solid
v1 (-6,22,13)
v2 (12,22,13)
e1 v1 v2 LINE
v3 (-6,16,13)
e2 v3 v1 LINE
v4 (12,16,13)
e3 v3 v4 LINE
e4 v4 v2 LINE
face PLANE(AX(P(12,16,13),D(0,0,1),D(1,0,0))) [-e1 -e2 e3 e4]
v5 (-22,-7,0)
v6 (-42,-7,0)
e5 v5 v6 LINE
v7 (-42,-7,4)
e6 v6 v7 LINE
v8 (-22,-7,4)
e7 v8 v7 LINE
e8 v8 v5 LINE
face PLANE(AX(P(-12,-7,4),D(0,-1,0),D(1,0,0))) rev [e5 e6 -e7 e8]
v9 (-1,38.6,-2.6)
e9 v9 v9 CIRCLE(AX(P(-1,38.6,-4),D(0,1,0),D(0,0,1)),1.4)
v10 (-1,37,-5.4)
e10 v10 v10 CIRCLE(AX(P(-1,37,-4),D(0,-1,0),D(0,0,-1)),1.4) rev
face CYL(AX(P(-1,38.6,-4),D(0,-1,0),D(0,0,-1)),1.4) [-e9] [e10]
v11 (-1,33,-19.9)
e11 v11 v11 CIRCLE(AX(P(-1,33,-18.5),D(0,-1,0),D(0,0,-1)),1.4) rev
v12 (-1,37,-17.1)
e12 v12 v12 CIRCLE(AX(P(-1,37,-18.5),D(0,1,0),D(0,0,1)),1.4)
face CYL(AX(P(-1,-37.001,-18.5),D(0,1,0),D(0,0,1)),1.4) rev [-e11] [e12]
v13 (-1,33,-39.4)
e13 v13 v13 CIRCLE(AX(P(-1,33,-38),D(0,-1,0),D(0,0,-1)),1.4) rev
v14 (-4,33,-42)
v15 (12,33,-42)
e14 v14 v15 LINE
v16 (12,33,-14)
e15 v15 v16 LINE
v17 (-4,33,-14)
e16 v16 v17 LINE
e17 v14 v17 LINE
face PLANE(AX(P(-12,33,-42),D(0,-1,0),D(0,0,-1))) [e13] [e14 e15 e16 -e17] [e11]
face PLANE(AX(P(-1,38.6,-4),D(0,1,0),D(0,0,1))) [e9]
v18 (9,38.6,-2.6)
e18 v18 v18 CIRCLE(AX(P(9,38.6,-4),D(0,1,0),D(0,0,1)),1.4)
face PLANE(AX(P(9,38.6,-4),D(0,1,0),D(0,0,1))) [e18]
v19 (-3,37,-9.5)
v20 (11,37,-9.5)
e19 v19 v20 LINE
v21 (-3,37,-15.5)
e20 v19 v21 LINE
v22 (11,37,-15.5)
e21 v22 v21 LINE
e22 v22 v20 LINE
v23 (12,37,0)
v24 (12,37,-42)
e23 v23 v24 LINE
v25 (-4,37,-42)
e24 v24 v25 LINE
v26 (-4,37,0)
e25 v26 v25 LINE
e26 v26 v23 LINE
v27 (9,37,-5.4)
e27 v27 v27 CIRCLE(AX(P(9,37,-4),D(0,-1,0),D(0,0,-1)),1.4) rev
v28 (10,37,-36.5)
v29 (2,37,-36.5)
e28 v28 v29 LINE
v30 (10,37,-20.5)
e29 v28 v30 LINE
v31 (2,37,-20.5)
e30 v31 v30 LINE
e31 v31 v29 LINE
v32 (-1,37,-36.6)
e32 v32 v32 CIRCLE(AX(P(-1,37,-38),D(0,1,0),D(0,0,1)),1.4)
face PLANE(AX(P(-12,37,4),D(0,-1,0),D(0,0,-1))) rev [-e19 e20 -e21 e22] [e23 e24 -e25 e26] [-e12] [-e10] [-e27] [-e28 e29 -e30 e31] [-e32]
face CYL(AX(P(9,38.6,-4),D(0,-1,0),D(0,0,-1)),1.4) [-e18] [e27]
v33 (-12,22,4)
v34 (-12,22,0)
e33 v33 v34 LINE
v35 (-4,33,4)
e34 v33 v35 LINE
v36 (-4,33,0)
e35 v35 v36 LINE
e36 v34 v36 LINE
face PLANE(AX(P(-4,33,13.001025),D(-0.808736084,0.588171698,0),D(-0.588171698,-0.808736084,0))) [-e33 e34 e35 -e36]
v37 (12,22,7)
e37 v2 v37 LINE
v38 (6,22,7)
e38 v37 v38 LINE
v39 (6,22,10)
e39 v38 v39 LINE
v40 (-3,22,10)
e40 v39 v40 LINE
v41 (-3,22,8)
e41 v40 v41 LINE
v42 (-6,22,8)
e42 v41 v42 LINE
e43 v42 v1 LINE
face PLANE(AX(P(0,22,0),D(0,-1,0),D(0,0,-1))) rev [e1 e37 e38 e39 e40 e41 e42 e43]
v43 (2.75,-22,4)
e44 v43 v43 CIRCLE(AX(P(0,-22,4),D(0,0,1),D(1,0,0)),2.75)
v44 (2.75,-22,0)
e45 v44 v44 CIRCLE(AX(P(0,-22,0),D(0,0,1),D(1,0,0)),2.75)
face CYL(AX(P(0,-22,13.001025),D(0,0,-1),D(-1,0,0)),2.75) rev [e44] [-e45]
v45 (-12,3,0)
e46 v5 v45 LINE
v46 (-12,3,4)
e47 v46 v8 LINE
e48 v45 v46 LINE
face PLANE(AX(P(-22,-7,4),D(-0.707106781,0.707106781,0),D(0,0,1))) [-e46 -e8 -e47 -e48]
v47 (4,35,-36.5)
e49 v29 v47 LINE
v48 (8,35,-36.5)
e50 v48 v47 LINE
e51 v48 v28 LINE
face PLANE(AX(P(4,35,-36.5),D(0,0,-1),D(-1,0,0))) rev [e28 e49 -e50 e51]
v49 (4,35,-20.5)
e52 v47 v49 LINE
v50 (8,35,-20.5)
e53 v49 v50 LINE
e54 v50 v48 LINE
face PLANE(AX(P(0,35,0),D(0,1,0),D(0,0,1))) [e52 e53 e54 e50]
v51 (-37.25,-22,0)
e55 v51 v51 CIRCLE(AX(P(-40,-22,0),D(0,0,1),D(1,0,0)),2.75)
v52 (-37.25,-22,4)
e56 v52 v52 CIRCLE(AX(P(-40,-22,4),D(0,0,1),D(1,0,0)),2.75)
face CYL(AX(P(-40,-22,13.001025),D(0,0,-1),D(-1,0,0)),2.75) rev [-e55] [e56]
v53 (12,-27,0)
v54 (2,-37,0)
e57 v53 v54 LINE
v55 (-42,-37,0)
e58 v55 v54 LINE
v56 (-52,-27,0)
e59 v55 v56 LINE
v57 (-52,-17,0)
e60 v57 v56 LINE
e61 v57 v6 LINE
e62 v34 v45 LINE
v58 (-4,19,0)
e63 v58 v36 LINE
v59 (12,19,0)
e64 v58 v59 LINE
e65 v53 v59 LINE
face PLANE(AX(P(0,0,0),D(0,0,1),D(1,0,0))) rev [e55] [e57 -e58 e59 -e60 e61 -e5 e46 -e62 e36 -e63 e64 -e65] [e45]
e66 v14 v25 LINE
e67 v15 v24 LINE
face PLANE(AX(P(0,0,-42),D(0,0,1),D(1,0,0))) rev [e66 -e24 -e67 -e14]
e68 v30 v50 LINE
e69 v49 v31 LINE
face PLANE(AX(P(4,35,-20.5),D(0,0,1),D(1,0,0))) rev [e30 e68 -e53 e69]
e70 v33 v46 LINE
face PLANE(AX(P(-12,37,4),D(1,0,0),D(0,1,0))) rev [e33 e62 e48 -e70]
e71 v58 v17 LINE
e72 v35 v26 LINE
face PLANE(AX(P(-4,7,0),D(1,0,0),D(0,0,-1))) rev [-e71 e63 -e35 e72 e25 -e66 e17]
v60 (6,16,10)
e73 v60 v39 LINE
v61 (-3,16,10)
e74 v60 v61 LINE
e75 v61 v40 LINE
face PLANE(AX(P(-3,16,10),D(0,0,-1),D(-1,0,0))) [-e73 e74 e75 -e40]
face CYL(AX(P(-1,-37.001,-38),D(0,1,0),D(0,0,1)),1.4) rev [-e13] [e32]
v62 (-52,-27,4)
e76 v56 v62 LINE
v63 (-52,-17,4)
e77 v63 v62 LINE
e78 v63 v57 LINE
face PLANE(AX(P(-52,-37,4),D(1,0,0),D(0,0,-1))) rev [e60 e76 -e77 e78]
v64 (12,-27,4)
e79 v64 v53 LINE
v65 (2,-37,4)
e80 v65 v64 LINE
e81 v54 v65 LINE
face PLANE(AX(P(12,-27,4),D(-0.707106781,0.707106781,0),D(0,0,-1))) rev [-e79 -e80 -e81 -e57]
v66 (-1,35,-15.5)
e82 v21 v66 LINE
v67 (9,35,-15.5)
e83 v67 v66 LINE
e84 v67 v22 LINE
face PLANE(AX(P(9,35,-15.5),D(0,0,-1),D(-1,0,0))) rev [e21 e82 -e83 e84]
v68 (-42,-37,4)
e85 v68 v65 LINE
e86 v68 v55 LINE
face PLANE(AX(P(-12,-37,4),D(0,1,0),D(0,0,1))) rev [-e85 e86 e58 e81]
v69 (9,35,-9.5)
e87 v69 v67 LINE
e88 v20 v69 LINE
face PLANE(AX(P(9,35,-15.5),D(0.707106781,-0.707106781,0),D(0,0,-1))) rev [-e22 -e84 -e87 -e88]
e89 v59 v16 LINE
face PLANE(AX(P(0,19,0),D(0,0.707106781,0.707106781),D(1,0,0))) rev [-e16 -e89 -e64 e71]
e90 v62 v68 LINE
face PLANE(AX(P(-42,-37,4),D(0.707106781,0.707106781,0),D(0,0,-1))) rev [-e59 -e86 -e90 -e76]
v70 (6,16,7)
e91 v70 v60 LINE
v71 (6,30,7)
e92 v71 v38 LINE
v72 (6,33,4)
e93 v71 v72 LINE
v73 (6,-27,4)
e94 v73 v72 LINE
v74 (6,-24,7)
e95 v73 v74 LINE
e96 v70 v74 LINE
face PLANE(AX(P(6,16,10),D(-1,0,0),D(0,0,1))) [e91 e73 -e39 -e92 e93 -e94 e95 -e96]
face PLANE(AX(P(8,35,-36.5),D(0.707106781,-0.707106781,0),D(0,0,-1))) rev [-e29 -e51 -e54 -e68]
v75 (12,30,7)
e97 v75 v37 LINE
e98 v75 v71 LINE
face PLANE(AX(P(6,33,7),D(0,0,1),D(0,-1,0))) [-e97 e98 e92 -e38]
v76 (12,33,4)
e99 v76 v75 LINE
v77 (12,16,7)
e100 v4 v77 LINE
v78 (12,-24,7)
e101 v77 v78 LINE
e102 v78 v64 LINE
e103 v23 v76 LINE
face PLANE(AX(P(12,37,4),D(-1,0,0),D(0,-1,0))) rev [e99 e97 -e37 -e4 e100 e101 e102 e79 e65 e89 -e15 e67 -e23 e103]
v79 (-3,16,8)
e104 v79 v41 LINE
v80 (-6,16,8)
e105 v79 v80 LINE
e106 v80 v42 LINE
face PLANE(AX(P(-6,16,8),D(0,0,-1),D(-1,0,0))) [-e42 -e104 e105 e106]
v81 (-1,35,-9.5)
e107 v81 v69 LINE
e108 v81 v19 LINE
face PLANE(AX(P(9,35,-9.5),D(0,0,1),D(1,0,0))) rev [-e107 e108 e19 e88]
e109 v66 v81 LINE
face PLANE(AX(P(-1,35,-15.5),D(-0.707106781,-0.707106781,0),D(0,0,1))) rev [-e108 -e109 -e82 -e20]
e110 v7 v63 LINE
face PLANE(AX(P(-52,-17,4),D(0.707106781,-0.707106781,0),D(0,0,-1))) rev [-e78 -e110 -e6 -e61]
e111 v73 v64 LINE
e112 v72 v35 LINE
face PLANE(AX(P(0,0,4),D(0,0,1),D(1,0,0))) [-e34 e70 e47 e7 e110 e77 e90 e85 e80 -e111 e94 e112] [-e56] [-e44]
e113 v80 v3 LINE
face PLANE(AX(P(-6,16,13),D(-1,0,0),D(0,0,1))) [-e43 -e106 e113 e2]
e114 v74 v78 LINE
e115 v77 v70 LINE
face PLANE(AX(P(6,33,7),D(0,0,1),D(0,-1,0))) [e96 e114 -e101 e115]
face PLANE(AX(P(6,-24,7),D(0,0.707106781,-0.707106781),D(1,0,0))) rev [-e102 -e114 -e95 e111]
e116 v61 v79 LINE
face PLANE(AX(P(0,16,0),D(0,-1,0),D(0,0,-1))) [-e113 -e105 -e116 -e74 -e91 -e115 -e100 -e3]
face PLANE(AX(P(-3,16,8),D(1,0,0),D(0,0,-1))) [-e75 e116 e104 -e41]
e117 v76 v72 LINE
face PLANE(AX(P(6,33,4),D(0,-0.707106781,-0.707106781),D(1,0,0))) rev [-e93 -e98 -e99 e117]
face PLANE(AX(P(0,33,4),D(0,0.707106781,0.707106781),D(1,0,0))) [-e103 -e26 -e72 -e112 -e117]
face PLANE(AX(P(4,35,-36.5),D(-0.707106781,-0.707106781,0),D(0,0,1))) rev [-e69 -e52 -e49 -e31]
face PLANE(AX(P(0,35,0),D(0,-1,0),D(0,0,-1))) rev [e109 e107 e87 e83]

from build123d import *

# Parameters (mm, degrees)
SKETCH1_W           = 24
SKETCH1_H           = 74
BOSS_EXTRUDE1_DEPTH = 4
SKETCH3_W           = 24
SKETCH3_H           = 4
BOSS_EXTRUDE2_DEPTH = 42
CHAMFER1_SIZE       = 14
CHAMFER2_SIZE       = 4
SKETCH4_W           = 8
SKETCH4_H           = 42
CUT_EXTRUDE3_DEPTH  = 30
SKETCH5_R           = 1.4
BOSS_EXTRUDE3_DEPTH = 1.6
CUT_EXTRUDE4_REACH  = 87.93
SKETCH6_R           = 1.4
BOSS_EXTRUDE4_DEPTH = 6
CUT_EXTRUDE6_REACH  = 60.292
SKETCH11_W          = 40
SKETCH11_H          = 30
BOSS_EXTRUDE6_DEPTH = 4
CUT_EXTRUDE2_REACH  = 79.188
SKETCH2_R           = 2.75
CHAMFER3_SIZE       = 10
SKETCH12_W          = 3
SKETCH12_H          = 60
BOSS_EXTRUDE7_DEPTH = 6
CHAMFER4_SIZE       = 3
SKETCH13_W          = 4
SKETCH13_H          = 16
SKETCH13_W_2        = 10
SKETCH13_H_2        = 6
CUT_EXTRUDE7_DEPTH  = 2
CHAMFER5_SIZE       = 2


with BuildPart() as part:
    # Sketch1 → Boss-Extrude1 (new body)
    with BuildSketch(Plane.XY):
        Rectangle(SKETCH1_W, SKETCH1_H)
    extrude(amount=BOSS_EXTRUDE1_DEPTH)

    # Sketch3 → Boss-Extrude2 (add)
    with BuildSketch(Plane.XY):
        with Locations((0, 35)):
            Rectangle(SKETCH3_W, SKETCH3_H)
    extrude(amount=-BOSS_EXTRUDE2_DEPTH)

    # Chamfer1
    chamfer1_edges = [part.edges().sort_by_distance(p)[0] for p in [
        (0, 33, 0),
    ]]
    chamfer(chamfer1_edges, length=CHAMFER1_SIZE)

    # Chamfer2
    chamfer2_edges = [part.edges().sort_by_distance(p)[0] for p in [
        (0, 37, 4),
    ]]
    chamfer(chamfer2_edges, length=CHAMFER2_SIZE)

    # Sketch4 → Cut-Extrude3 (cut)
    with BuildSketch(Plane(origin=(0, 37, 0), x_dir=(1, 0, 0), z_dir=(0, 1, 0))):
        with Locations((-8, 21)):
            Rectangle(SKETCH4_W, SKETCH4_H)
    extrude(amount=-CUT_EXTRUDE3_DEPTH, mode=Mode.SUBTRACT)

    # Sketch5 → Boss-Extrude3 (add)
    with BuildSketch(Plane(origin=(0, 37, 0), x_dir=(1, 0, 0), z_dir=(0, 1, 0))):
        with Locations(Location((-1, 4, 0), (0, 0, 90))):
            Circle(SKETCH5_R)
        with Locations(Location((9, 4, 0), (0, 0, 90))):
            Circle(SKETCH5_R)
    extrude(amount=BOSS_EXTRUDE3_DEPTH)

    # Sketch6 → Cut-Extrude4 (cut, up to next)
    with BuildSketch(Plane(origin=(0, 37, 0), x_dir=(1, 0, 0), z_dir=(0, 1, 0)), mode=Mode.PRIVATE) as cut_extrude4_sk1:
        with Locations(Location((-1, 18.5, 0), (0, 0, 270))):
            Circle(SKETCH6_R)
    cut_extrude4_tool1 = extrude(cut_extrude4_sk1.sketch, amount=-CUT_EXTRUDE4_REACH, mode=Mode.PRIVATE) & part.part
    # Sketch6 → Cut-Extrude4 (cut, up to next)
    with BuildSketch(Plane(origin=(0, 37, 0), x_dir=(1, 0, 0), z_dir=(0, 1, 0)), mode=Mode.PRIVATE) as cut_extrude4_sk2:
        with Locations(Location((-1, 38, 0), (0, 0, 270))):
            Circle(SKETCH6_R)
    cut_extrude4_tool2 = extrude(cut_extrude4_sk2.sketch, amount=-CUT_EXTRUDE4_REACH, mode=Mode.PRIVATE) & part.part
    add(cut_extrude4_tool1.solids().sort_by_distance((-1, 37, -18.5))[0], mode=Mode.SUBTRACT)
    add(cut_extrude4_tool2.solids().sort_by_distance((-1, 37, -38))[0], mode=Mode.SUBTRACT)

    # Sketch7 → Boss-Extrude4 (add)
    with BuildSketch(Plane(origin=(0, 22, 0), x_dir=(1, 0, 0), z_dir=(0, 1, 0))):
        Polygon((12, -4), (12, -13), (-6, -13), (-6, -8), (-3, -8), (-3, -10), (6, -10), (6, -4), align=None)
    extrude(amount=-BOSS_EXTRUDE4_DEPTH)

    # Sketch9 → Cut-Extrude6 (cut, up to next)
    with BuildSketch(Plane.XY, mode=Mode.PRIVATE) as cut_extrude6_sk1:
        Polygon((-4, 37), (-4, 33), (-12, 22), (-12, 37), align=None)
    cut_extrude6_tool1 = extrude(cut_extrude6_sk1.sketch, amount=CUT_EXTRUDE6_REACH, mode=Mode.PRIVATE) & part.part
    add(cut_extrude6_tool1.solids().sort_by_distance((-8.77193, 31.719298, 0))[0], mode=Mode.SUBTRACT)

    # Sketch11 → Boss-Extrude6 (add)
    with BuildSketch(Plane.XY):
        with Locations((-32, -22)):
            Rectangle(SKETCH11_W, SKETCH11_H)
    extrude(amount=BOSS_EXTRUDE6_DEPTH)

    # Sketch2 → Cut-Extrude2 (cut, up to next)
    with BuildSketch(Plane.XY, mode=Mode.PRIVATE) as cut_extrude2_sk1:
        with Locations((0, -22)):
            Circle(SKETCH2_R)
    cut_extrude2_tool1 = extrude(cut_extrude2_sk1.sketch, amount=CUT_EXTRUDE2_REACH, mode=Mode.PRIVATE) & part.part
    # Sketch2 → Cut-Extrude2 (cut, up to next)
    with BuildSketch(Plane.XY, mode=Mode.PRIVATE) as cut_extrude2_sk2:
        with Locations((-40, -22)):
            Circle(SKETCH2_R)
    cut_extrude2_tool2 = extrude(cut_extrude2_sk2.sketch, amount=CUT_EXTRUDE2_REACH, mode=Mode.PRIVATE) & part.part
    add(cut_extrude2_tool1.solids().sort_by_distance((0, -22, 0))[0], mode=Mode.SUBTRACT)
    add(cut_extrude2_tool2.solids().sort_by_distance((-40, -22, 0))[0], mode=Mode.SUBTRACT)

    # Chamfer3
    chamfer3_edges = [part.edges().sort_by_distance(p)[0] for p in [
        (-12, -7, 2),
        (-52, -37, 2),
        (-52, -7, 2),
        (12, -37, 2),
    ]]
    chamfer(chamfer3_edges, length=CHAMFER3_SIZE)

    # Sketch12 → Boss-Extrude7 (add)
    with BuildSketch(Plane(origin=(12, 0, 0), x_dir=(0, 0, -1), z_dir=(1, 0, 0))):
        with Locations((-5.5, 3)):
            Rectangle(SKETCH12_W, SKETCH12_H)
    extrude(amount=-BOSS_EXTRUDE7_DEPTH)

    # Chamfer4
    chamfer4_edges = [part.edges().sort_by_distance(p)[0] for p in [
        (9, 33, 7),
        (9, -27, 7),
    ]]
    chamfer(chamfer4_edges, length=CHAMFER4_SIZE - 0.0001)  # a hair under: the kernel refuses the full size

    # Sketch13 → Cut-Extrude7 (cut)
    with BuildSketch(Plane(origin=(0, 37, 0), x_dir=(1, 0, 0), z_dir=(0, 1, 0))):
        with Locations((6, 28.5)):
            Rectangle(SKETCH13_W, SKETCH13_H)
        with Locations((4, 12.5)):
            Rectangle(SKETCH13_W_2, SKETCH13_H_2)
    extrude(amount=-CUT_EXTRUDE7_DEPTH, mode=Mode.SUBTRACT)

    # Chamfer5
    chamfer5_edges = [part.edges().sort_by_distance(p)[0] for p in [
        (4, 37, -28.5),
        (-1, 37, -12.5),
        (9, 37, -12.5),
        (8, 37, -28.5),
    ]]
    chamfer(chamfer5_edges, length=CHAMFER5_SIZE - 0.0001)  # a hair under: the kernel refuses the full size


solid = part.part
